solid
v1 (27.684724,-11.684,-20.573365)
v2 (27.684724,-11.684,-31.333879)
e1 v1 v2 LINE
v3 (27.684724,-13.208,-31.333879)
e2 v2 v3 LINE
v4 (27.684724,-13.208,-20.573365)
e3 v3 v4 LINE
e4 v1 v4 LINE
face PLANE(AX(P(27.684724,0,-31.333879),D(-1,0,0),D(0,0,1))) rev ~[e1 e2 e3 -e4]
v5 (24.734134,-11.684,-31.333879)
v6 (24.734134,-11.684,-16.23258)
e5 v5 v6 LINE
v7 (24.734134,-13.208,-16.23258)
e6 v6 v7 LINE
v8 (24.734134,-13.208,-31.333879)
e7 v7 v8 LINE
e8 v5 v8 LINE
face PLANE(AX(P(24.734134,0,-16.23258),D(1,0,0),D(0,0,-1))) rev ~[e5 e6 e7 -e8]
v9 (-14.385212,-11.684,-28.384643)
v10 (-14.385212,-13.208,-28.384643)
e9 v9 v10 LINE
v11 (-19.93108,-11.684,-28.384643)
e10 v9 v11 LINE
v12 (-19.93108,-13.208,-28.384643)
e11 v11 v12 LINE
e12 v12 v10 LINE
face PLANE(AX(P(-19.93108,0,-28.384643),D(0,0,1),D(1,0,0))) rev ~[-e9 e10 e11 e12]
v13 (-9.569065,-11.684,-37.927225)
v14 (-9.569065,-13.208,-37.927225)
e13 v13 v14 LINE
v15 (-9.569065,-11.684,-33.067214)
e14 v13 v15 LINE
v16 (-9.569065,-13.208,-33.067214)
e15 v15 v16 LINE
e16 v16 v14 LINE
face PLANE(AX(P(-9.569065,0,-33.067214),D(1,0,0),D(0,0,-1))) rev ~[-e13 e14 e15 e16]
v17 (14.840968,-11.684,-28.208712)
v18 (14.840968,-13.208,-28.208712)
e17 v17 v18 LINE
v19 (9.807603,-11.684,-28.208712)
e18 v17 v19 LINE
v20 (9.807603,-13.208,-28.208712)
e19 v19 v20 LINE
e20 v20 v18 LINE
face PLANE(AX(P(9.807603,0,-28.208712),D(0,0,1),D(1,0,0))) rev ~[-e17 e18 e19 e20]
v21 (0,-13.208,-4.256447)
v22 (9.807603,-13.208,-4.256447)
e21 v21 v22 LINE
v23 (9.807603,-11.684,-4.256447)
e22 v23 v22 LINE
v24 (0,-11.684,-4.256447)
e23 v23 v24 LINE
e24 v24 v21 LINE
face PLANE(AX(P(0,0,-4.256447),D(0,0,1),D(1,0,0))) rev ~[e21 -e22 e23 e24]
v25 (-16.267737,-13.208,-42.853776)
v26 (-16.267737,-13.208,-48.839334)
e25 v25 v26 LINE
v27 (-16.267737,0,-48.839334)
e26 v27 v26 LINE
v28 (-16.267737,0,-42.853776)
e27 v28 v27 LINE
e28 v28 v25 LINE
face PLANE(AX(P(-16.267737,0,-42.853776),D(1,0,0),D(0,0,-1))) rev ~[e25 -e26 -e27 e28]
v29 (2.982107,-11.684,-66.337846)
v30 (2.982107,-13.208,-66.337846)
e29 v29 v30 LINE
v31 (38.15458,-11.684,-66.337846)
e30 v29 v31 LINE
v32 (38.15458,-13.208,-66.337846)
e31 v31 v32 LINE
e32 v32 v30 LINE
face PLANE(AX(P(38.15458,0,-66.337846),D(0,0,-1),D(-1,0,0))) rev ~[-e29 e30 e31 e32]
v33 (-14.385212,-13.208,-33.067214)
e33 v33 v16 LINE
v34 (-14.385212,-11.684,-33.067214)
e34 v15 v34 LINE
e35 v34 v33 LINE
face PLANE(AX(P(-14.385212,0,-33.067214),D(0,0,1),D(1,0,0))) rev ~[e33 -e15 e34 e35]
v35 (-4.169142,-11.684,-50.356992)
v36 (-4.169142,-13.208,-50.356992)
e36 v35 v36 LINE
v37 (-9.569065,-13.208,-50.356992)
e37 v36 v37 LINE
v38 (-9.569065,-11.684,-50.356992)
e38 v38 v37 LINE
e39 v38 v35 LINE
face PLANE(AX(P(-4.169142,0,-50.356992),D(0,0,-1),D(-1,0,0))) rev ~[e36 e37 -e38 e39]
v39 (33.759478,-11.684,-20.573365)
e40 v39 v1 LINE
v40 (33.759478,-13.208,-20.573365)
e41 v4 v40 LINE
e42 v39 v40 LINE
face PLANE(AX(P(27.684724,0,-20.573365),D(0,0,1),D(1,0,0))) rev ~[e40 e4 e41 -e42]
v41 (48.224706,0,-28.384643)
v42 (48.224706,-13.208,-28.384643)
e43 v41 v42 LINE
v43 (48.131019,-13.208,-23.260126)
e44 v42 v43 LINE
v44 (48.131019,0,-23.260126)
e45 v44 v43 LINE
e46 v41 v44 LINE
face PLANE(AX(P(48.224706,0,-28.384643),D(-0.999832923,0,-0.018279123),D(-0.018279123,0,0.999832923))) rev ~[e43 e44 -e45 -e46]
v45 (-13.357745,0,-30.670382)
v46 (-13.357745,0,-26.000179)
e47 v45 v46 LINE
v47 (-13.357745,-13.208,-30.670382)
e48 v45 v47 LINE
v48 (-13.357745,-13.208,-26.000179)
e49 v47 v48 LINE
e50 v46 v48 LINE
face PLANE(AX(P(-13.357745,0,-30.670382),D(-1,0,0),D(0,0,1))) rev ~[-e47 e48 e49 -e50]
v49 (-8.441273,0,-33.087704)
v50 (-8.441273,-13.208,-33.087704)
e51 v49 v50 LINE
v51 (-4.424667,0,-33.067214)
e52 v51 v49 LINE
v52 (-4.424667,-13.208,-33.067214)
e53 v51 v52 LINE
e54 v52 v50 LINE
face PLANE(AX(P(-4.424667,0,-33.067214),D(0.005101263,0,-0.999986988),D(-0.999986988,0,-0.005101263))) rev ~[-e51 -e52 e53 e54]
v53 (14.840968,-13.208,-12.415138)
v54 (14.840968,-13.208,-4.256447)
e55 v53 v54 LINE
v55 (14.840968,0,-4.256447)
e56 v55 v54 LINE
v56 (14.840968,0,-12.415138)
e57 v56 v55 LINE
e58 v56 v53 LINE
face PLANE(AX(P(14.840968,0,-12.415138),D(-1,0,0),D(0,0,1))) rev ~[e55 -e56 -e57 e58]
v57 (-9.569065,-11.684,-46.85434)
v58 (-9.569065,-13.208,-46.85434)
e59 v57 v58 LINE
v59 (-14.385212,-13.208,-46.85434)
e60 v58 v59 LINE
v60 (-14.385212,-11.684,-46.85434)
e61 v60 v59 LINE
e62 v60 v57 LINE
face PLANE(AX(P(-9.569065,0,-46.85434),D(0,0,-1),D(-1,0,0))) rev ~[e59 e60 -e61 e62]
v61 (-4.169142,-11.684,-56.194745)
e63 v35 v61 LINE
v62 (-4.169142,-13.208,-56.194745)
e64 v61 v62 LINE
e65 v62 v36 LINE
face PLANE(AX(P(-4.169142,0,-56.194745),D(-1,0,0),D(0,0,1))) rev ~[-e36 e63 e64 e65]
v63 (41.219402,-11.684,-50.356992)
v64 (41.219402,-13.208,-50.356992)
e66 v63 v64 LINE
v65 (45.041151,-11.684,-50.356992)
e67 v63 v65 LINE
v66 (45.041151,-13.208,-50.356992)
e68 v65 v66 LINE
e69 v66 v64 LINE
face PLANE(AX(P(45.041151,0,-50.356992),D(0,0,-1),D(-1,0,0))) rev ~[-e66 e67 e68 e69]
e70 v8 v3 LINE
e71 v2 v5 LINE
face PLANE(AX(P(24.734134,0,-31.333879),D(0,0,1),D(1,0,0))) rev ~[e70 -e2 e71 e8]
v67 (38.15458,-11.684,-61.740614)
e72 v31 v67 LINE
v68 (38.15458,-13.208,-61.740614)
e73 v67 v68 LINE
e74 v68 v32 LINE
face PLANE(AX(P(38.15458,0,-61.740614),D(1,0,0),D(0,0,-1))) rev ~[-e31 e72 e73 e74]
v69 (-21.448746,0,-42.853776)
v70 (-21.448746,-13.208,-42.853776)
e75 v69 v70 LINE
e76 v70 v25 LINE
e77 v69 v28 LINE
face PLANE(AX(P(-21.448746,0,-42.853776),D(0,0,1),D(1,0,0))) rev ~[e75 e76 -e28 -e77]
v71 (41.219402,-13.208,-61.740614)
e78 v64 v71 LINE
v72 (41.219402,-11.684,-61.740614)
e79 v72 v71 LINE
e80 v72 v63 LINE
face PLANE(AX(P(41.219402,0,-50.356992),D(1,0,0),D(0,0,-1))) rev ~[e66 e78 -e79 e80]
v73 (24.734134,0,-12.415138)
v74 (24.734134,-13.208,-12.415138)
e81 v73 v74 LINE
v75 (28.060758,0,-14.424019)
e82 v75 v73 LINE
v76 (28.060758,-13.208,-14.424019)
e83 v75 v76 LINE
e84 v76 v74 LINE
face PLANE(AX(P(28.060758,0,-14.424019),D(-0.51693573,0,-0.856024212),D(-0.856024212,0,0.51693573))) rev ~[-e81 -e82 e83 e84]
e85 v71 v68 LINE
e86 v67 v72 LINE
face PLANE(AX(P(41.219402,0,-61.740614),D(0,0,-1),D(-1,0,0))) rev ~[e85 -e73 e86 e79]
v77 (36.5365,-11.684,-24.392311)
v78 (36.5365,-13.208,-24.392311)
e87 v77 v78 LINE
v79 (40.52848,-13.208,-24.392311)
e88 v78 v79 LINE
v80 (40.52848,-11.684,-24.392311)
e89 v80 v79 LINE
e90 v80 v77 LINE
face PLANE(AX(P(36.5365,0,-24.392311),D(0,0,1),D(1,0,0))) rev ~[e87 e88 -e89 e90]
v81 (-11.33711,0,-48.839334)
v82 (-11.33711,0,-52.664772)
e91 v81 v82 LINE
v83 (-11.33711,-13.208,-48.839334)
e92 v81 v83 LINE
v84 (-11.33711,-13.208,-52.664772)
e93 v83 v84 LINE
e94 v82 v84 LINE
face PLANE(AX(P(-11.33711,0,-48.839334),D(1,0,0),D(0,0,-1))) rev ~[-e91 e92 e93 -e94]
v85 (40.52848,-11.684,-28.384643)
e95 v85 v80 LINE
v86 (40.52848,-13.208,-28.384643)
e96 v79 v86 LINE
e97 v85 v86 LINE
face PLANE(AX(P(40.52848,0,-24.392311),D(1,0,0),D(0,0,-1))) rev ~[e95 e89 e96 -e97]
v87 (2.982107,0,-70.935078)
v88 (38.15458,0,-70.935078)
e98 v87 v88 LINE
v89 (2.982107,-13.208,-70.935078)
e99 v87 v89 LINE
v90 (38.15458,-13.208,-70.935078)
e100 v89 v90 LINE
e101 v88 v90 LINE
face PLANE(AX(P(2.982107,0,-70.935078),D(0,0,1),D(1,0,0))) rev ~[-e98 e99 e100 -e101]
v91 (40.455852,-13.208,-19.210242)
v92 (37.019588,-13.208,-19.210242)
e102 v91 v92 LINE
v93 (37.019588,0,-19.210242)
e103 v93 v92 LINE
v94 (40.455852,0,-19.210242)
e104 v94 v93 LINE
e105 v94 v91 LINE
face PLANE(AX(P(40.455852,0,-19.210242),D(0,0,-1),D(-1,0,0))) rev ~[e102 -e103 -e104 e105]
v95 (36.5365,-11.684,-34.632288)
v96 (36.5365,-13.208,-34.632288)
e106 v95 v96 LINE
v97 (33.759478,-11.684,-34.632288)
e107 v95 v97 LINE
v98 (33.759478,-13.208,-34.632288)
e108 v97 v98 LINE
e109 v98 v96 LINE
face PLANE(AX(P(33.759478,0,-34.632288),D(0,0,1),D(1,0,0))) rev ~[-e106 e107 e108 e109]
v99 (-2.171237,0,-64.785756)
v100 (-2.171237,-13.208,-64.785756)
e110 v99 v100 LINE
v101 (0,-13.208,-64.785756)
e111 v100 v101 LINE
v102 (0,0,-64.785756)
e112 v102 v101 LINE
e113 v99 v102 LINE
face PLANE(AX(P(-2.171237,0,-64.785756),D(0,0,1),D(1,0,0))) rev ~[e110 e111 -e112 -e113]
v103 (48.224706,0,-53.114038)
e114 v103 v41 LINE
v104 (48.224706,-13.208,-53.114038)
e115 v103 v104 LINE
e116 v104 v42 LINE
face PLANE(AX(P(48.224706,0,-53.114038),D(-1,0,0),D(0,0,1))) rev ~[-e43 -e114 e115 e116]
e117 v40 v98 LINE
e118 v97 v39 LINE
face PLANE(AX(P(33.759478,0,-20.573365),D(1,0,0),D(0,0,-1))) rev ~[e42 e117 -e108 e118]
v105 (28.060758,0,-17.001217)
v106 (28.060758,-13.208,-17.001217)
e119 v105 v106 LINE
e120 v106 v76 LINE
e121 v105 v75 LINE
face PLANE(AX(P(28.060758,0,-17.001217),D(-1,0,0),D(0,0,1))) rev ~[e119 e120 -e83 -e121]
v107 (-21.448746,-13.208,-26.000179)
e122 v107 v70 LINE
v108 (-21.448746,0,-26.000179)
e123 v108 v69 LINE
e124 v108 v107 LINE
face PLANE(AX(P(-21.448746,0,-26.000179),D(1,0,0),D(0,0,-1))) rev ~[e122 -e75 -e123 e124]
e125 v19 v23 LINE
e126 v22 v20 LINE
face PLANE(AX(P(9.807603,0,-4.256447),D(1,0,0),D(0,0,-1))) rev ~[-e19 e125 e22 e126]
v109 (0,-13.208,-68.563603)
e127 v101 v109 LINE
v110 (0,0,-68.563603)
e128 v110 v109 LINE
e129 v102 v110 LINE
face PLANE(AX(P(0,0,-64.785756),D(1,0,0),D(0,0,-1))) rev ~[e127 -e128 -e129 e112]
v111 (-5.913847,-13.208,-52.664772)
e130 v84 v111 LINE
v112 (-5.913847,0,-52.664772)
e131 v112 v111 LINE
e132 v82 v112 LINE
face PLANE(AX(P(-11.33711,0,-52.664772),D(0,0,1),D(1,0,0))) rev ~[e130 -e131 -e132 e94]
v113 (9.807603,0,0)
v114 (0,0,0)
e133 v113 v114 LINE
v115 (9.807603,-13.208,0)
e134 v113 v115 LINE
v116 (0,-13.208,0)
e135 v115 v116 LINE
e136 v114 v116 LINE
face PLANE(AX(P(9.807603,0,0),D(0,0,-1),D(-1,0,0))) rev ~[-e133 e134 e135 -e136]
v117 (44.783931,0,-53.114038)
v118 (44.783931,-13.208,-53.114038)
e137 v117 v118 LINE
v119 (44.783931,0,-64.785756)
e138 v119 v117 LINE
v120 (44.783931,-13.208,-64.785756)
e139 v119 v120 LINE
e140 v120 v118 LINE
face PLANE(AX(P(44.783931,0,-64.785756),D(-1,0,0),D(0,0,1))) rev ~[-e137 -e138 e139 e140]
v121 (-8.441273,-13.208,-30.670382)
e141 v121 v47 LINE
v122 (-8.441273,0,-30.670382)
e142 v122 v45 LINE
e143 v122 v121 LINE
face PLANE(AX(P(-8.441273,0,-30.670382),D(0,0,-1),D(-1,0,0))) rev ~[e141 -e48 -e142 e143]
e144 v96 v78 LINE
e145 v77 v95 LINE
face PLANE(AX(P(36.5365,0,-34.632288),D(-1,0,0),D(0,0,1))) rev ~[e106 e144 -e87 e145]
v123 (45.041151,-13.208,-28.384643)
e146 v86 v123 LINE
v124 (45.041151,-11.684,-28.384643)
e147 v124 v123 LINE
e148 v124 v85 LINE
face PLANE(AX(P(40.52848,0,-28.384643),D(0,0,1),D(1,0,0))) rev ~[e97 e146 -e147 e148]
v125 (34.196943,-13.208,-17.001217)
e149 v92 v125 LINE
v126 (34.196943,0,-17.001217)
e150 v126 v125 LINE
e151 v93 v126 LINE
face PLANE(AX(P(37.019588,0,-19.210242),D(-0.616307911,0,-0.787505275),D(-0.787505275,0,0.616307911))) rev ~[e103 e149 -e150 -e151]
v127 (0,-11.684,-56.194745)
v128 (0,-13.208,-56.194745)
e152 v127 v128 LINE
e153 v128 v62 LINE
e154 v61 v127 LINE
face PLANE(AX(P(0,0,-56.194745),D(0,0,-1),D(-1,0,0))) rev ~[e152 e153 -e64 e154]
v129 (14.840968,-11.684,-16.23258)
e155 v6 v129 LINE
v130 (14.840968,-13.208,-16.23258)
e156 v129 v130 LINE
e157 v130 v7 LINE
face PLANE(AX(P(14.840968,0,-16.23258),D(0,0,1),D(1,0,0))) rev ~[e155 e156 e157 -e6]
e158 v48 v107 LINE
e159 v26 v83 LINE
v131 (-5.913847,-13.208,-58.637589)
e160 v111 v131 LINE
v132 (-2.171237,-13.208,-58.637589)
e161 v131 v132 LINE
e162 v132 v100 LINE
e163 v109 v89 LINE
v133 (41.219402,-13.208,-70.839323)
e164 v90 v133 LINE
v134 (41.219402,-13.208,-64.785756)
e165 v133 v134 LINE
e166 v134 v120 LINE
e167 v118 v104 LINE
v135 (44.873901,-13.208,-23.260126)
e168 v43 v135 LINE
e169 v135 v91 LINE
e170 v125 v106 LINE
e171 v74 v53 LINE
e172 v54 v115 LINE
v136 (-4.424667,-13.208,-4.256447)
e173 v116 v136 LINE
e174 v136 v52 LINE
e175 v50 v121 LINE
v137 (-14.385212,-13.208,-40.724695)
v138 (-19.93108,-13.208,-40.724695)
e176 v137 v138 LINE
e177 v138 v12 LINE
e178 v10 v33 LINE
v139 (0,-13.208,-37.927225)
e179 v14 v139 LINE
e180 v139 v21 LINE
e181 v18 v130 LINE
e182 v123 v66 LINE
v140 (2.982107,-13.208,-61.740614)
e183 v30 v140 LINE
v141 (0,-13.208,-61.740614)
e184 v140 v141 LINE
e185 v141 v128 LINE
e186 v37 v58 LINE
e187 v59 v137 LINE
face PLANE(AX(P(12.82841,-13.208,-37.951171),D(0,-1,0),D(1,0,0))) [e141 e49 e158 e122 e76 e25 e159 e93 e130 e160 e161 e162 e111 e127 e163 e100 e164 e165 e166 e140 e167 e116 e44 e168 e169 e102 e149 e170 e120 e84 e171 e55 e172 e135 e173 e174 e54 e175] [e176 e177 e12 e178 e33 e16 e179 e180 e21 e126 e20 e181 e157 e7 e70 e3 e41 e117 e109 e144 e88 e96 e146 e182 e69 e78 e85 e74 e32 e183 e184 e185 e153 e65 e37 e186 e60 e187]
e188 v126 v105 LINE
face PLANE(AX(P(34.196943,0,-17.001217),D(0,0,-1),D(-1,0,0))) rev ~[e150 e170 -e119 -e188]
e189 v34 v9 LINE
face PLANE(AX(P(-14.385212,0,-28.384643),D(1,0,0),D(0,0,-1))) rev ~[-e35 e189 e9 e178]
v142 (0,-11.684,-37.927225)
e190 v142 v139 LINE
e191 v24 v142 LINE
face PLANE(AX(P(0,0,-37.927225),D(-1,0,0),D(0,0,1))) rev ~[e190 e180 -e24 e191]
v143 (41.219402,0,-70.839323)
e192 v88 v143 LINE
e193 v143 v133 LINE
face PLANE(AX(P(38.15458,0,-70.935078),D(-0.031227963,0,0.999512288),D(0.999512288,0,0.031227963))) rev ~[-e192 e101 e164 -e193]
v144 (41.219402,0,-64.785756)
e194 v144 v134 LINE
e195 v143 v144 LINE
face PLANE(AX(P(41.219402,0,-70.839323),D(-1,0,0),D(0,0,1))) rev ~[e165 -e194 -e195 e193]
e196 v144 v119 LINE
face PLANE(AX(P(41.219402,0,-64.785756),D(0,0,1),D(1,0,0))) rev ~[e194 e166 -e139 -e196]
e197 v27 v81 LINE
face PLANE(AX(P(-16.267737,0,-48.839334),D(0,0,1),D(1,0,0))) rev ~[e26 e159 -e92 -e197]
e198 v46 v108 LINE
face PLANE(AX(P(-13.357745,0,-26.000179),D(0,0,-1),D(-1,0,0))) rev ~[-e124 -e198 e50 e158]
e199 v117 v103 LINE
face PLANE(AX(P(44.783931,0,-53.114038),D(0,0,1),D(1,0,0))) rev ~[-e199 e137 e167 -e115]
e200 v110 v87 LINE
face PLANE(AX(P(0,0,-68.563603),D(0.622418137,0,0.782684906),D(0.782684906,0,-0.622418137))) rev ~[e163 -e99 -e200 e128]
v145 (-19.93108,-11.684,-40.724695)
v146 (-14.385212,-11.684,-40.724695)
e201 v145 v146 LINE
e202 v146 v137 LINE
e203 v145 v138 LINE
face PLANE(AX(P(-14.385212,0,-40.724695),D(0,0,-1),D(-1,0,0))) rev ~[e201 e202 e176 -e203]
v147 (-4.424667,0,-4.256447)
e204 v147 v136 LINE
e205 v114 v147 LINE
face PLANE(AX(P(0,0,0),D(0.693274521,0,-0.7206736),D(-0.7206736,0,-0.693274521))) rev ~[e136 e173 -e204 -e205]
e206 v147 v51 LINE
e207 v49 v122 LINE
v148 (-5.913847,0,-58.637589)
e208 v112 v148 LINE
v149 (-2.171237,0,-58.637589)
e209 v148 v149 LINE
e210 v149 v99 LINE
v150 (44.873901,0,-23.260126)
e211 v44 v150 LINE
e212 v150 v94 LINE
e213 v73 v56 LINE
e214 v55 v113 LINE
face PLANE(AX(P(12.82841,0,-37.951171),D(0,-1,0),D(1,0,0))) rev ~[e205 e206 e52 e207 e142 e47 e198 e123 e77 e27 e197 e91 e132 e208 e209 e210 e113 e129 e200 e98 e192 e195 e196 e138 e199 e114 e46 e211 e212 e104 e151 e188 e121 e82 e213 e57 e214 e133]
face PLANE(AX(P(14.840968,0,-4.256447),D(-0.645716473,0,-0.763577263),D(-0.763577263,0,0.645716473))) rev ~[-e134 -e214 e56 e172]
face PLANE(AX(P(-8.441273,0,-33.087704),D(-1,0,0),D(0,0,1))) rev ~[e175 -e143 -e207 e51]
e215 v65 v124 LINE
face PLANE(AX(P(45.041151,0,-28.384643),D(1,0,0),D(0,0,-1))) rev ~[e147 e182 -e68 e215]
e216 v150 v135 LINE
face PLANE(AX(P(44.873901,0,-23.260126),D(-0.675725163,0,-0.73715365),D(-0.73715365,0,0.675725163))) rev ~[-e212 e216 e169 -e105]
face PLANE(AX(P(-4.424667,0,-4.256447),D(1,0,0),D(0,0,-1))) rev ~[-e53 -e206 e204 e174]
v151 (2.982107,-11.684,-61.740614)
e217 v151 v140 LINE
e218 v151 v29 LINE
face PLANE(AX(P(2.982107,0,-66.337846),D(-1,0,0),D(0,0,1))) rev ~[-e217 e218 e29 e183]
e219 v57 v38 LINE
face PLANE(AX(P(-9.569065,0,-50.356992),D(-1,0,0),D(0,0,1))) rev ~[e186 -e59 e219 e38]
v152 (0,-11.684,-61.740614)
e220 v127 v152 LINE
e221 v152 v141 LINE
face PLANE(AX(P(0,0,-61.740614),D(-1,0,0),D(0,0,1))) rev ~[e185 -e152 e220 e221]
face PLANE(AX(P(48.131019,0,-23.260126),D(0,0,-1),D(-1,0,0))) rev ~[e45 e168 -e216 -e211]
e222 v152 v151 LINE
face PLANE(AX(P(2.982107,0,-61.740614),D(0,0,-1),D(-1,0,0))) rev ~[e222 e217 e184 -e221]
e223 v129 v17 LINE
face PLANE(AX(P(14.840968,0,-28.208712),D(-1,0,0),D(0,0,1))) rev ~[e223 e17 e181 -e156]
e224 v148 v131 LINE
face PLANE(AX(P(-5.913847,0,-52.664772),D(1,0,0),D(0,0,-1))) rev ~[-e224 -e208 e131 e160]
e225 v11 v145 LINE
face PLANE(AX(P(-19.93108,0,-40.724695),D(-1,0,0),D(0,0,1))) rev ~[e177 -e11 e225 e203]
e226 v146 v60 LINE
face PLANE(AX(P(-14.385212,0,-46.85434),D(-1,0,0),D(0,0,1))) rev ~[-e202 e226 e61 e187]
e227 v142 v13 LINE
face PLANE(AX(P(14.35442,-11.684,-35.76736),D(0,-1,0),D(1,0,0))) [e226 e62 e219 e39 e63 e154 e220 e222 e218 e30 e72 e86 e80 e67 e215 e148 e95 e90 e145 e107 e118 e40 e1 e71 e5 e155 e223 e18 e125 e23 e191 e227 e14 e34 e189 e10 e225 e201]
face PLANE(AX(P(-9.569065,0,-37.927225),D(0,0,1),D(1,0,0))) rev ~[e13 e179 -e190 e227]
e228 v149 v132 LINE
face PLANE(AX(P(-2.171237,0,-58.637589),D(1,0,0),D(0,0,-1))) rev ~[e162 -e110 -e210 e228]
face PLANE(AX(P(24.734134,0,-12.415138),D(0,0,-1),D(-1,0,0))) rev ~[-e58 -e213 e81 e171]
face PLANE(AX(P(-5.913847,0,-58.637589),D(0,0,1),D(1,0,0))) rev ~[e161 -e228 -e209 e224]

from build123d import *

# Parameters (mm, degrees)
F1_DEPTH = 11.684
F2_DEPTH = 13.208


# Not quite as in the source:
# - a feature names something its author has since deleted; it is built from what else it names


with BuildPart() as f1:
    # F0 (on Front) → F1 (new body)
    with BuildSketch(Plane.XZ):
        Polygon((9.8076034337, -4.2564473115), (0, -4.2564473115), (0, -28.2072033733), (0, -37.9272252321), (-4.4246674515, -37.9272252321), (-9.569064714, -37.9272252321), (-9.569064714, -33.0672143027), (-14.3852122128, -33.0672143027), (-14.3852122128, -28.3846426755), (-19.9310798198, -28.3846426755), (-19.9310798198, -40.7246947289), (-14.3852122128, -40.7246947289), (-14.3852122128, -46.85433954), (-9.569064714, -46.85433954), (-9.569064714, -50.3569915891), (-4.1691423394, -50.3569915891), (-4.1691423394, -56.1947450042), (0, -56.1947450042), (0, -61.7406144738), (2.9821074568, -61.7406144738), (2.9821074568, -66.3378462195), (38.154579699, -66.3378462195), (38.154579699, -61.7406144738), (41.2194021046, -61.7406144738), (41.2194021046, -50.3569915891), (45.0411513448, -50.3569915891), (45.0411513448, -28.3846426755), (40.5284799635, -28.3846426755), (40.5284799635, -24.3923105299), (36.5364998579, -24.3923105299), (36.5364998579, -34.6322879195), (33.7594784796, -34.6322879195), (33.7594784796, -24.3923105299), (33.7594784796, -20.5733645707), (27.6847239584, -20.5733645707), (27.6847239584, -31.3338786364), (24.7341338545, -31.3338786364), (24.7341338545, -20.5733645707), (24.7341338545, -16.2325797137), (14.8409679532, -16.2325797137), (14.8409679532, -28.2087121159), (9.8076034337, -28.2087121159), align=None)
    extrude(amount=F1_DEPTH)

    # F0 (on Front) → F2 (join)
    with BuildSketch(Plane.XZ):
        Polygon((9.8076034337, 0), (0, 0), (-4.4246674515, -4.2564473115), (-4.4246674515, -28.2072033733), (-4.4246674515, -33.0672143027), (-8.441273123, -33.0877043307), (-8.441273123, -30.6703820825), (-13.3577445522, -30.6703820825), (-13.3577445522, -26.0001793504), (-21.4487463236, -26.0001793504), (-21.4487463236, -42.8537763655), (-16.2677373737, -42.8537763655), (-16.2677373737, -48.8393343985), (-11.3371098414, -48.8393343985), (-11.3371098414, -52.6647716761), (-5.9138466604, -52.6647716761), (-5.9138466604, -58.6375892162), (-2.1712374873, -58.6375892162), (-2.1712374873, -64.7857561707), (0, -64.7857561707), (0, -68.5636028647), (2.9821074568, -70.9350779653), (38.154579699, -70.9350779653), (41.2194021046, -70.8393231034), (41.2194021046, -64.7857561707), (44.7839312255, -64.7857561707), (44.7839312255, -61.7406144738), (44.7839312255, -53.1140379608), (48.2247062027, -53.1140379608), (48.2247062027, -50.3569915891), (48.2247062027, -28.3846426755), (48.131018877, -23.2601258904), (44.8739007115, -23.2601258904), (40.4558517039, -19.210241735), (37.0195880532, -19.210241735), (34.1969430447, -17.0012172312), (28.0607584864, -17.0012172312), (28.0607584864, -14.4240194932), (24.7341338545, -12.4151380733), (14.8409679532, -12.4151380733), (14.8409679532, -4.2564473115), align=None)
        Polygon((0, -28.2072033733), (0, -4.2564473115), (9.8076034337, -4.2564473115), (9.8076034337, -28.2087121159), (14.8409679532, -28.2087121159), (14.8409679532, -16.2325797137), (24.7341338545, -16.2325797137), (24.7341338545, -20.5733645707), (24.7341338545, -31.3338786364), (27.6847239584, -31.3338786364), (27.6847239584, -20.5733645707), (33.7594784796, -20.5733645707), (33.7594784796, -24.3923105299), (33.7594784796, -34.6322879195), (36.5364998579, -34.6322879195), (36.5364998579, -24.3923105299), (40.5284799635, -24.3923105299), (40.5284799635, -28.3846426755), (45.0411513448, -28.3846426755), (45.0411513448, -50.3569915891), (41.2194021046, -50.3569915891), (41.2194021046, -61.7406144738), (38.154579699, -61.7406144738), (38.154579699, -66.3378462195), (2.9821074568, -66.3378462195), (2.9821074568, -61.7406144738), (0, -61.7406144738), (0, -56.1947450042), (-4.1691423394, -56.1947450042), (-4.1691423394, -50.3569915891), (-9.569064714, -50.3569915891), (-9.569064714, -46.85433954), (-14.3852122128, -46.85433954), (-14.3852122128, -40.7246947289), (-19.9310798198, -40.7246947289), (-19.9310798198, -28.3846426755), (-14.3852122128, -28.3846426755), (-14.3852122128, -33.0672143027), (-9.569064714, -33.0672143027), (-9.569064714, -37.9272252321), (-4.4246674515, -37.9272252321), (0, -37.9272252321), align=None, mode=Mode.SUBTRACT)
    extrude(amount=F2_DEPTH)


solid = f1.part
